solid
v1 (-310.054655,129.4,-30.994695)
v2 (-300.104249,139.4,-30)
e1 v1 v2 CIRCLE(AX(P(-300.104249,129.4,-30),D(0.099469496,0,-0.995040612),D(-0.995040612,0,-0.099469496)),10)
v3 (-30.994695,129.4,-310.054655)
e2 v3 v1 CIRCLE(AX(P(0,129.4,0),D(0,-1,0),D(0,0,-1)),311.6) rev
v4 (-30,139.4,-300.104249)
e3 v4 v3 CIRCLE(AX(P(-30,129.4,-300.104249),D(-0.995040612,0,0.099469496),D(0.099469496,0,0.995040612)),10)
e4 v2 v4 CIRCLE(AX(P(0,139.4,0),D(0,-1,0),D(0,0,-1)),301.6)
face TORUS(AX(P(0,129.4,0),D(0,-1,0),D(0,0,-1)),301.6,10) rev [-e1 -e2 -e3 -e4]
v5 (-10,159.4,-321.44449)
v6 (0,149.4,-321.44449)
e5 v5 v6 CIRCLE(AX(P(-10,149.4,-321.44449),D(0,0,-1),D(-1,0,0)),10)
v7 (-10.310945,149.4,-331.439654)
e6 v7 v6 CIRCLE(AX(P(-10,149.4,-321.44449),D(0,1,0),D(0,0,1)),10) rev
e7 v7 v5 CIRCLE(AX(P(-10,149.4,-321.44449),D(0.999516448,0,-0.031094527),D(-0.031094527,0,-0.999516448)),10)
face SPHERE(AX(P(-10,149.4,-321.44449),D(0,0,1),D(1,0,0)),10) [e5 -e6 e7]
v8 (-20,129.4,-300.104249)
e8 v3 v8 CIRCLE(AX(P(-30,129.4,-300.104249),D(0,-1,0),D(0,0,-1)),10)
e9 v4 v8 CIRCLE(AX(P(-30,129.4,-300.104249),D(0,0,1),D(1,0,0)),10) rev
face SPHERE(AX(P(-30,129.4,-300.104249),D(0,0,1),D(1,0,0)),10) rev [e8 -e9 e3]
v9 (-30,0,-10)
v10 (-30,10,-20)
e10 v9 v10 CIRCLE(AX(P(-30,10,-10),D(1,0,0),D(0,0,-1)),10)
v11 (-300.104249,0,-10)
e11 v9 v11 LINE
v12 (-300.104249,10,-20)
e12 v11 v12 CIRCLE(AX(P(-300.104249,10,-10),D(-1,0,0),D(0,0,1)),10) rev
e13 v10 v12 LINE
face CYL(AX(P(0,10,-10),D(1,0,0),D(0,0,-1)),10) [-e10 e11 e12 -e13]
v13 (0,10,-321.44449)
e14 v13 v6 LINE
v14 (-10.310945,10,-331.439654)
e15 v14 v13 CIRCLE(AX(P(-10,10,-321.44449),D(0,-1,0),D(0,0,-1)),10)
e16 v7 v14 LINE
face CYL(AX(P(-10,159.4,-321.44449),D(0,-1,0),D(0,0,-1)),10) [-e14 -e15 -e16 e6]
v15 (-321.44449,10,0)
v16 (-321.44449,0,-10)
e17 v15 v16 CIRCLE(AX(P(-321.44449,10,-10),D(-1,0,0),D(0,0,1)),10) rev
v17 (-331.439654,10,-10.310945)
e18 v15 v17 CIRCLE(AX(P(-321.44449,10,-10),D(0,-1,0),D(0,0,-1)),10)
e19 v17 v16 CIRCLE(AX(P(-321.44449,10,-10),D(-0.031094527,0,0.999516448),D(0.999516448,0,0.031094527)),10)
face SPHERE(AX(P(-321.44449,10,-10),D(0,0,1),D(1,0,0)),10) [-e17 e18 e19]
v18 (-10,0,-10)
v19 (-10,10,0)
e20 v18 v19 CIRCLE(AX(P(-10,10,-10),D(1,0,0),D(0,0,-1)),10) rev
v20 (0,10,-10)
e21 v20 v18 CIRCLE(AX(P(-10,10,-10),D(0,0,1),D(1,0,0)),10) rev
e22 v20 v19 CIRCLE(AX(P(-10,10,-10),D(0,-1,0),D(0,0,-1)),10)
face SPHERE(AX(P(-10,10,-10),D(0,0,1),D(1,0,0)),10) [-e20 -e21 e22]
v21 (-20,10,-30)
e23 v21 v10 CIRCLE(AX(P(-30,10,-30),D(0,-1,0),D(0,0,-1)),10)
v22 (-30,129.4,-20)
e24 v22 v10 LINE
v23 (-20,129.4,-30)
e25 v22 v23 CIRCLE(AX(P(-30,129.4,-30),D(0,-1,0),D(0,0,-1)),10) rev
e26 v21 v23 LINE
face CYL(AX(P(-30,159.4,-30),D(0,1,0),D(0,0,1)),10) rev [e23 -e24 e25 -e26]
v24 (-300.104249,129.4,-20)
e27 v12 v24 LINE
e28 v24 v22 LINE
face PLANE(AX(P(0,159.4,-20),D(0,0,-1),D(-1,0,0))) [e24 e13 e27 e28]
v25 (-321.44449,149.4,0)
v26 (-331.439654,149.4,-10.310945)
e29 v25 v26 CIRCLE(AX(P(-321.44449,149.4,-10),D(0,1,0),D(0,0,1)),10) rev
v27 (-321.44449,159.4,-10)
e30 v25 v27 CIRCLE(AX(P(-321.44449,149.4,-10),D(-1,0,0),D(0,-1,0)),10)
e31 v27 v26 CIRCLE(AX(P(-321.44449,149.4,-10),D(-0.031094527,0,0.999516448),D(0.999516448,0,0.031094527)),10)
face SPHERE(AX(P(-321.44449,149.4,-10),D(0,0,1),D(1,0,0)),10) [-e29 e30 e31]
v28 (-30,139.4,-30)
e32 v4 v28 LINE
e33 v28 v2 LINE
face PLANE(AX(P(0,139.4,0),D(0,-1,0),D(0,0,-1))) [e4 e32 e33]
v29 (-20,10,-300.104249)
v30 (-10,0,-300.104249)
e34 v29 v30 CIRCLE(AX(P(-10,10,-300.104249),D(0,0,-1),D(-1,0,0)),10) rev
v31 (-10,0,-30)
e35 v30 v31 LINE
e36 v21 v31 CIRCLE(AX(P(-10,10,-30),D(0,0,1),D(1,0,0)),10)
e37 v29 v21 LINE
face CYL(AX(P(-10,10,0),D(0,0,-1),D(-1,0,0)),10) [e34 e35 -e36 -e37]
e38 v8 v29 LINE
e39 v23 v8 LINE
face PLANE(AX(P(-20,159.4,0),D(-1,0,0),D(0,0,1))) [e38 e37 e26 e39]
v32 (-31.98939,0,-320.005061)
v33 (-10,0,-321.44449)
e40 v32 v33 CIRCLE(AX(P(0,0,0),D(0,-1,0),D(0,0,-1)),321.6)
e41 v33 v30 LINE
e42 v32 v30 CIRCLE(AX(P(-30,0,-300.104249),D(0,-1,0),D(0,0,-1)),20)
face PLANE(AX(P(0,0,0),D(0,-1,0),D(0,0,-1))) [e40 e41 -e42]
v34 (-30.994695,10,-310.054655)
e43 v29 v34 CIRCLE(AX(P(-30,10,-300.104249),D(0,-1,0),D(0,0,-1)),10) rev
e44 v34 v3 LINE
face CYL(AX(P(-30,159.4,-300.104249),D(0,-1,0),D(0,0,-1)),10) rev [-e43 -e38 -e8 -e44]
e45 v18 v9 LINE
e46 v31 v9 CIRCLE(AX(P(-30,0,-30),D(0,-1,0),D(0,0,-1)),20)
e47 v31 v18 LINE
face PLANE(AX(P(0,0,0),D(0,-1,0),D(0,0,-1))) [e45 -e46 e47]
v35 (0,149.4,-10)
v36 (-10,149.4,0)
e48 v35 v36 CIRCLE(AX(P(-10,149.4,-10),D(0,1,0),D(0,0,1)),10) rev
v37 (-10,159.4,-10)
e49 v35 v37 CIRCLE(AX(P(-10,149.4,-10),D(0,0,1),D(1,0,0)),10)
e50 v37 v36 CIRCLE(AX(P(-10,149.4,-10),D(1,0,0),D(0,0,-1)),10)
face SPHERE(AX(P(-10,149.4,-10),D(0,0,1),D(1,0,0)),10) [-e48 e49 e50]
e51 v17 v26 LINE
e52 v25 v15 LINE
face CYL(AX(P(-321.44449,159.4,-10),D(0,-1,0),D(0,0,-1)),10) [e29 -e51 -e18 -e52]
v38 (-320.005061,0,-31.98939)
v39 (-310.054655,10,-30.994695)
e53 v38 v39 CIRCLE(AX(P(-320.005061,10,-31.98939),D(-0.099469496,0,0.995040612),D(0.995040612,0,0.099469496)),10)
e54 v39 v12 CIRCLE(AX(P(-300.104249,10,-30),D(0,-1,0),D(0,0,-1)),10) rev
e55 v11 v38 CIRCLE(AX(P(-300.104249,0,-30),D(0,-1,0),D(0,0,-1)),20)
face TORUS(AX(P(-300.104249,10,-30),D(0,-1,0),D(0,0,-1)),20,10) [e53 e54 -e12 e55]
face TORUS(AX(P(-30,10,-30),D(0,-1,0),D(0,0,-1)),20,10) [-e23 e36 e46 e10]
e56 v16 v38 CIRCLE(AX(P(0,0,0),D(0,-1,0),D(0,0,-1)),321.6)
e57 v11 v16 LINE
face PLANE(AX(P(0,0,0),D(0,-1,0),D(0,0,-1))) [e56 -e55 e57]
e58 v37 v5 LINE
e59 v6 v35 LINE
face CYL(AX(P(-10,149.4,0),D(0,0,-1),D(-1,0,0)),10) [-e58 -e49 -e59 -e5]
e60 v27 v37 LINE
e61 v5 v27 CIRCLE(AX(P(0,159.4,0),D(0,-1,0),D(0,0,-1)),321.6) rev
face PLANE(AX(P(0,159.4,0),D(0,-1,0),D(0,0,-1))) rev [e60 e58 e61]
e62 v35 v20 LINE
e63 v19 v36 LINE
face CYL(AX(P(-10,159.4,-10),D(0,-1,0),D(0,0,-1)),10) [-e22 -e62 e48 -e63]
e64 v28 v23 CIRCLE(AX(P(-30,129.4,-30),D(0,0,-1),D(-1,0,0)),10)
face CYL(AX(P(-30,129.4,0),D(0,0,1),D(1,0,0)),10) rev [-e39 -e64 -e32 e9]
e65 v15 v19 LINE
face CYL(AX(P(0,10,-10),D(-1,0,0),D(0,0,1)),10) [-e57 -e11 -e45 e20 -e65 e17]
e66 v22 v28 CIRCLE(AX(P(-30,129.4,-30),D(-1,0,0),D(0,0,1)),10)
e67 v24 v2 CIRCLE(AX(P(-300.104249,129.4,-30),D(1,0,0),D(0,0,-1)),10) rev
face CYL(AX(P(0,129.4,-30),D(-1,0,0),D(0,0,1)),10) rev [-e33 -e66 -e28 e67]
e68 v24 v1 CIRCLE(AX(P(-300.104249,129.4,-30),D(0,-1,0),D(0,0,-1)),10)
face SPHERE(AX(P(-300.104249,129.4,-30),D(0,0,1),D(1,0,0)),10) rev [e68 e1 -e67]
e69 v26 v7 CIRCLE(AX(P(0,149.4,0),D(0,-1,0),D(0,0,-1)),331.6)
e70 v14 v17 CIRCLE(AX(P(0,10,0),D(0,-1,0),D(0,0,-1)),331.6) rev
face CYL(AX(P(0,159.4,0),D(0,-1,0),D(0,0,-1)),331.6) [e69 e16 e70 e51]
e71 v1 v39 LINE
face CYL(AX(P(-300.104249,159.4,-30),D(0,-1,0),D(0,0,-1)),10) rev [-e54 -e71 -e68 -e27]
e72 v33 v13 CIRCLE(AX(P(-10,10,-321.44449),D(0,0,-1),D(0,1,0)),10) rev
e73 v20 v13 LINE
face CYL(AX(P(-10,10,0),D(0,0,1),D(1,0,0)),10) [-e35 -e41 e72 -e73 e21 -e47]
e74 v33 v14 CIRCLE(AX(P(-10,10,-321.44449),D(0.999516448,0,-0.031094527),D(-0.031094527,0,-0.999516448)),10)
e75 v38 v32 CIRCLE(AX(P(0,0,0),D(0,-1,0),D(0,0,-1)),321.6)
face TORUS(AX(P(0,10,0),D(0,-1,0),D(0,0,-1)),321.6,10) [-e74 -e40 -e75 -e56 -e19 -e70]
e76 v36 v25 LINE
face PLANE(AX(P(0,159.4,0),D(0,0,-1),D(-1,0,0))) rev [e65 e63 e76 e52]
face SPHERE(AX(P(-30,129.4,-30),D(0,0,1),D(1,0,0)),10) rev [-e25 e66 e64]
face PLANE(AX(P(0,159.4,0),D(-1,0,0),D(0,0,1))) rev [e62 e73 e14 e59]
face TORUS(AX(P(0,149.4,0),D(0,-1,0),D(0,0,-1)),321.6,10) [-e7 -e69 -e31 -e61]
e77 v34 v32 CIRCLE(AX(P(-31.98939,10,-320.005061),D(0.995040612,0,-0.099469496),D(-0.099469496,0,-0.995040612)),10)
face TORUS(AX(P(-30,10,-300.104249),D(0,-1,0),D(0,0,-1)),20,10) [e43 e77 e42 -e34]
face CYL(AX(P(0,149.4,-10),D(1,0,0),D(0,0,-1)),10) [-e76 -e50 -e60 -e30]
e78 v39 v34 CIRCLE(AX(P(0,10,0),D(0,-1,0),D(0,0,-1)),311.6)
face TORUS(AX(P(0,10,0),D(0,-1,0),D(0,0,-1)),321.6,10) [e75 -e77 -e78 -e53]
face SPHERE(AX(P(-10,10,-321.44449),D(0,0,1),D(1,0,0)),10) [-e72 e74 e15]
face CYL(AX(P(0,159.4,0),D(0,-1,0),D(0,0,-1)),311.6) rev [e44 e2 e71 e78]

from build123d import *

# Parameters (mm, degrees)
BOSS_EXTRUDE1_DEPTH = 159.4
SHELL1_T            = -20
FILLET1_R           = 10


with BuildPart() as part:
    # Sketch1 → Boss-Extrude1 (new body)
    with BuildSketch(Plane(origin=(0, 0, 0), x_dir=(1, 0, 0), z_dir=(0, 1, 0))):
        with BuildLine():
            Line((0, 0), (-331.6, 0))
            ThreePointArc((-331.6, 0), (-234.476608641, 234.476608641), (0, 331.6))
            Line((0, 331.6), (0, 0))
        make_face()
    extrude(amount=BOSS_EXTRUDE1_DEPTH)

    # Shell1
    shell1_openings = [part.faces().sort_by_distance(p)[0] for p in [
        (-140.735411011, 0, -140.735411011),
    ]]
    offset(amount=SHELL1_T, openings=shell1_openings, kind=Kind.INTERSECTION)

    # Fillet1
    fillet1_edges = [part.edges().sort_by_distance(p)[0] for p in [
        (-20, 0, -165.478744528),
        (-20, 69.7, -20),
        (-165.8, 159.4, 0),
        (-220.334473018, 0, -220.334473018),
        (-20, 69.7, -310.957489056),
        (-165.478744528, 0, -20),
        (-310.957489056, 69.7, -20),
        (-20, 139.4, -165.478744528),
        (-220.334473018, 139.4, -220.334473018),
        (-165.478744528, 139.4, -20),
        (-165.8, 0, 0),
        (-234.476608641, 0, -234.476608641),
        (0, 0, -165.8),
        (0, 159.4, -165.8),
        (0, 79.7, 0),
        (-331.6, 79.7, 0),
        (0, 79.7, -331.6),
        (-234.476608641, 159.4, -234.476608641),
    ]]
    fillet(fillet1_edges, radius=FILLET1_R - 0.0001)  # a hair under: the kernel refuses the full size


solid = part.part
